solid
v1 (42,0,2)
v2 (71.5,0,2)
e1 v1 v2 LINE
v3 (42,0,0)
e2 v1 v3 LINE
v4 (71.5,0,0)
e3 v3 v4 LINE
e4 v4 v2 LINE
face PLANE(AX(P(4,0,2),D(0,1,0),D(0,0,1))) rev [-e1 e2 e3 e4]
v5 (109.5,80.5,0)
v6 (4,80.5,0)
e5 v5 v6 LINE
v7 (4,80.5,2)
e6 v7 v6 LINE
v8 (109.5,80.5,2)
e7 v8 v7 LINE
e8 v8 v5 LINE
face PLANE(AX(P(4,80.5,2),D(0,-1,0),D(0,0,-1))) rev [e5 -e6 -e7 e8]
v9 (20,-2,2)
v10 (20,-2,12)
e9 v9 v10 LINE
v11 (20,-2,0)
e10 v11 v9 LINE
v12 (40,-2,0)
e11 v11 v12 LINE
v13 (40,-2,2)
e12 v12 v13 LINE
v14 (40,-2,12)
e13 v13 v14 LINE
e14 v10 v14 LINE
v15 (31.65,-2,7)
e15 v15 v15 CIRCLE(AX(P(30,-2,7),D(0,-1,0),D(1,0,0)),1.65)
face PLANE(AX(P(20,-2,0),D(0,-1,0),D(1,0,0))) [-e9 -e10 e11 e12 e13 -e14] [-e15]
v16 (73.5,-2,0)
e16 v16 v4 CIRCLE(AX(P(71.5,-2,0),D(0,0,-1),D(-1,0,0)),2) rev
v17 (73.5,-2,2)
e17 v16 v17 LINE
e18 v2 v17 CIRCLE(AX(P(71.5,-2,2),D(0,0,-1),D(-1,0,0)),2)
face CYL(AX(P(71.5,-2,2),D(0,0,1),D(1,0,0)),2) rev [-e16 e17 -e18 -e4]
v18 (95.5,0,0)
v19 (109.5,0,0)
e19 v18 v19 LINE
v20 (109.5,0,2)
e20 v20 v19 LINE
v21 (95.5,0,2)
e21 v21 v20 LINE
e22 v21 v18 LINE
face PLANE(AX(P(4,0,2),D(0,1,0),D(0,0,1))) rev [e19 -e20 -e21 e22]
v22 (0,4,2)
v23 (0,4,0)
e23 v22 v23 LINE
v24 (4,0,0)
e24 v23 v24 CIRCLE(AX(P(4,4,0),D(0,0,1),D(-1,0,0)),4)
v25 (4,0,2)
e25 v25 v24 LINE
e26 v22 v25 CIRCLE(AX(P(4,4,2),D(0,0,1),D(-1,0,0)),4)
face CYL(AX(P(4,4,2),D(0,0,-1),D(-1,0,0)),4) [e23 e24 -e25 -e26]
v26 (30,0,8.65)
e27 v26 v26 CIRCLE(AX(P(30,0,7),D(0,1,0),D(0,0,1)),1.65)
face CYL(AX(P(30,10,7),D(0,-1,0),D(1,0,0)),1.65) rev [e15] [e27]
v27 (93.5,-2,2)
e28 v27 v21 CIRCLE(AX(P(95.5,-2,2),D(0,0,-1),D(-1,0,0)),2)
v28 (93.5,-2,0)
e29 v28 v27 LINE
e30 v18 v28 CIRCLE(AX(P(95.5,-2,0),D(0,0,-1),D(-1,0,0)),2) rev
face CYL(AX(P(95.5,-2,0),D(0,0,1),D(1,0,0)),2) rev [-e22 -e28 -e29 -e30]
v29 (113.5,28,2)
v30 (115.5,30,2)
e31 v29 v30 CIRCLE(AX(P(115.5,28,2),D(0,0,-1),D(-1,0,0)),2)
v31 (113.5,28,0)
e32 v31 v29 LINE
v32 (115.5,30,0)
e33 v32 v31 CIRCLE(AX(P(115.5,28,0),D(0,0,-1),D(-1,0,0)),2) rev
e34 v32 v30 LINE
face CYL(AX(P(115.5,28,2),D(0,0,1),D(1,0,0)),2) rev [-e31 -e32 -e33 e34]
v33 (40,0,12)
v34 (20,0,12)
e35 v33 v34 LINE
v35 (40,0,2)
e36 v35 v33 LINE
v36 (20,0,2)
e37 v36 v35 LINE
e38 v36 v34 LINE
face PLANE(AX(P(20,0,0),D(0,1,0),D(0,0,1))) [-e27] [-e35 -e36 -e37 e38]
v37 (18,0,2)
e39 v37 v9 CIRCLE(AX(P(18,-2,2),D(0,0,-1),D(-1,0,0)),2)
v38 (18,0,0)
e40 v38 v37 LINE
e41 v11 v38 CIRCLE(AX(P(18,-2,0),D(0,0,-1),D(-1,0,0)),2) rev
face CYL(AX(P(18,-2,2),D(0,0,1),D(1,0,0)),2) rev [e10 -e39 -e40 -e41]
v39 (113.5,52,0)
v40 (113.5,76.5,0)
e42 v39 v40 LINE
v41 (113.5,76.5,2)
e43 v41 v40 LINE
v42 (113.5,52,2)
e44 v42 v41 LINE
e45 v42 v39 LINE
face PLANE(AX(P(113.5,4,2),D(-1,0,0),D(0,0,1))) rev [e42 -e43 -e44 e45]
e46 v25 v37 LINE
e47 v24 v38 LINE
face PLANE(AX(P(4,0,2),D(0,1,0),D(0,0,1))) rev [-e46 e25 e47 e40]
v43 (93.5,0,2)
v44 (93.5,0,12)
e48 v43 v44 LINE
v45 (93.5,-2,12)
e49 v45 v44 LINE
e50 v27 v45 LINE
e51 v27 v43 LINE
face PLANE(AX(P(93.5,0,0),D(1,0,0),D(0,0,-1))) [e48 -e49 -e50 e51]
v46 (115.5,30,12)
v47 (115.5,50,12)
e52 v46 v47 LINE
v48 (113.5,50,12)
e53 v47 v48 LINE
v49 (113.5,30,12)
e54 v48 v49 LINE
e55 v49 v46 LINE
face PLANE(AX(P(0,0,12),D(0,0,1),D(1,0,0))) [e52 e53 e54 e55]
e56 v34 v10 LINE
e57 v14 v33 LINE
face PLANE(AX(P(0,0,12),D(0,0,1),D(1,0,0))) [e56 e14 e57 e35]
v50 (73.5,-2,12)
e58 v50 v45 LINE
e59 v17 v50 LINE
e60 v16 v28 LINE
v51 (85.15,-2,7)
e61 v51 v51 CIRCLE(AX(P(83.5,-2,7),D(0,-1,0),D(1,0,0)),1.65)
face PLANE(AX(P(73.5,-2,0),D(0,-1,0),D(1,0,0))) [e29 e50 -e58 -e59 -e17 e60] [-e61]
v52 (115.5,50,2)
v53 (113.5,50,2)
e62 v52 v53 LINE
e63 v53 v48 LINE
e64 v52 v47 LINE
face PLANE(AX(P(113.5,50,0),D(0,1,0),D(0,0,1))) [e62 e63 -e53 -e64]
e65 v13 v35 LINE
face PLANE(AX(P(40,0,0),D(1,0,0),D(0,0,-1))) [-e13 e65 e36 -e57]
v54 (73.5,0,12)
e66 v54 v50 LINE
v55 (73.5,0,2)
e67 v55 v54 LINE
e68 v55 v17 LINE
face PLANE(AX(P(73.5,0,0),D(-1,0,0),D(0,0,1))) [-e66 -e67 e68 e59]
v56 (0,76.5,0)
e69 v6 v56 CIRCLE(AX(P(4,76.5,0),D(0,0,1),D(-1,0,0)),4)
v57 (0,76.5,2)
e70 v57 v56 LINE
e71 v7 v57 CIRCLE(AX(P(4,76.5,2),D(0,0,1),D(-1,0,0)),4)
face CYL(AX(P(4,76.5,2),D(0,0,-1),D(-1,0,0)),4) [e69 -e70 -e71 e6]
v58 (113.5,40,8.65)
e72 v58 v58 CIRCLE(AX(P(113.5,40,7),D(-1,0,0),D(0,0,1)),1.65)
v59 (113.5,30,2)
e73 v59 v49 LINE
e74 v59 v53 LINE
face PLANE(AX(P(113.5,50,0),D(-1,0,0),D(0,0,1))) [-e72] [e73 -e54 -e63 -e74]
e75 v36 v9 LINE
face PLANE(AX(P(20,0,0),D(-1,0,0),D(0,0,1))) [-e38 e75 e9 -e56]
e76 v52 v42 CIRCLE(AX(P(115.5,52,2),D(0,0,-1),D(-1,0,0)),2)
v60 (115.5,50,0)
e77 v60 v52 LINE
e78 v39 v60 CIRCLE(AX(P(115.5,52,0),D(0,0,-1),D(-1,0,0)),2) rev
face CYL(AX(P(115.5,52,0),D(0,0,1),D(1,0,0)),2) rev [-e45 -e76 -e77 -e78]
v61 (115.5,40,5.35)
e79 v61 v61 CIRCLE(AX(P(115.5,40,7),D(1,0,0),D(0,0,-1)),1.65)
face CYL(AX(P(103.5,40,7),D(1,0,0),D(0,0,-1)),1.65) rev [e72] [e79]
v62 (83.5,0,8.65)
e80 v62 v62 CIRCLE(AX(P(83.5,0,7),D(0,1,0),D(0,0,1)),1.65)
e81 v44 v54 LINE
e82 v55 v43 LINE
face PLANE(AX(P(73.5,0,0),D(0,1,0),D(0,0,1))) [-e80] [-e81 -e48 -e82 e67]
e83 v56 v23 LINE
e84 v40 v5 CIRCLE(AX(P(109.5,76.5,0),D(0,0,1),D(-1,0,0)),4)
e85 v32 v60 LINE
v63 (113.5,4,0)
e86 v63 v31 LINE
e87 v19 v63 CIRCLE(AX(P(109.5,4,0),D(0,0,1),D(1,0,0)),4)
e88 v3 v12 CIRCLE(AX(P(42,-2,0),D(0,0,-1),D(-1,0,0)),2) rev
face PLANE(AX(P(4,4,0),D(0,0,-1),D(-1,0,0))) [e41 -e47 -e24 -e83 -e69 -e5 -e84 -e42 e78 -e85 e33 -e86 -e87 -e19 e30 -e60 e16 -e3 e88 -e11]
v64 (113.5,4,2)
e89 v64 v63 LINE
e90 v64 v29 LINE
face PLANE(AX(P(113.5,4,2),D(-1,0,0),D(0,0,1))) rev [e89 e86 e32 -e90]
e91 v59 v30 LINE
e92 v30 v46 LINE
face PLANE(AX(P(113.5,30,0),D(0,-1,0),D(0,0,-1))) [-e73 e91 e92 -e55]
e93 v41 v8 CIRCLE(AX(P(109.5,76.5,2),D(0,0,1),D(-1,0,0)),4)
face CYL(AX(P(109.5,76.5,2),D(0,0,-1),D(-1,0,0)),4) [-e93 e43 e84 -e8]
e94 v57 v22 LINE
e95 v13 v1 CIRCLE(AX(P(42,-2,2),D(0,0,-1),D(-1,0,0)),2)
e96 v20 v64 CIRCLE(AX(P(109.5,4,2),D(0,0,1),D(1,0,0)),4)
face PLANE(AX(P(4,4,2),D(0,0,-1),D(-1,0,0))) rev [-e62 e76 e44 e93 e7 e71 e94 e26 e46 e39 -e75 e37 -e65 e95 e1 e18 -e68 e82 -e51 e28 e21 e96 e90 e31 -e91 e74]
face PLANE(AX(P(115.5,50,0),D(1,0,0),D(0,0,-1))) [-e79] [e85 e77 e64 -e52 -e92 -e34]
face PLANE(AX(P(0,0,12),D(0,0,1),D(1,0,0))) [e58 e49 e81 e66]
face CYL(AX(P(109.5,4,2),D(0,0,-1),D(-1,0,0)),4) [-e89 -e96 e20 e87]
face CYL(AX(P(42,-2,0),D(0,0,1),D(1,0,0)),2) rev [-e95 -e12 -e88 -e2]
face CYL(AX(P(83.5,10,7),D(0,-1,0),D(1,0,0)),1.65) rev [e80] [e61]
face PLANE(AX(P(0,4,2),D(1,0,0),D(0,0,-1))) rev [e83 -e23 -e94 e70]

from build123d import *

# Parameters (mm, degrees)
EXTRUDE_1_DEPTH      = 2
EXTRUDE_2_DEPTH      = 10
EXTRUDE_2_DEPTH_BACK = 2
SKETCH_2_W           = 2
SKETCH_2_H           = 20
SKETCH_2_W_2         = 20
SKETCH_2_H_2         = 2
SKETCH_3_R           = 1.65
CUT_EXTRUDE_1_DEPTH  = 12
SKETCH_4_R           = 1.65
CUT_EXTRUDE_2_DEPTH  = 12
FILLET_1_R           = 2


with BuildPart() as part:
    # 草图1 → 凸台-拉伸1 (new body)
    with BuildSketch(Plane.XY):
        with BuildLine():
            Line((4, 0), (109.5, 0))
            ThreePointArc((109.5, 0), (112.328427125, 1.171572875), (113.5, 4))
            Line((113.5, 4), (113.5, 76.5))
            ThreePointArc((113.5, 76.5), (112.328427125, 79.328427125), (109.5, 80.5))
            Line((109.5, 80.5), (4, 80.5))
            ThreePointArc((4, 80.5), (1.171572875, 79.328427125), (0, 76.5))
            Line((0, 76.5), (0, 4))
            ThreePointArc((0, 4), (1.171572875, 1.171572875), (4, 0))
        make_face()
    extrude(amount=EXTRUDE_1_DEPTH)

    # 草图2 → 凸台-拉伸2 (add, two sides: drawn at the far end of the back side and taken through both)
    with BuildSketch(Plane.XY.offset(2).offset(-EXTRUDE_2_DEPTH_BACK)):
        with Locations((114.5, 40)):
            Rectangle(SKETCH_2_W, SKETCH_2_H)
        with Locations((30, -1)):
            Rectangle(SKETCH_2_W_2, SKETCH_2_H_2)
        with Locations((83.5, -1)):
            Rectangle(SKETCH_2_W_2, SKETCH_2_H_2)
    extrude(amount=EXTRUDE_2_DEPTH + EXTRUDE_2_DEPTH_BACK)

    # 草图3 → 切除-拉伸1 (cut)
    with BuildSketch(Plane(origin=(115.5, 0, 0), x_dir=(0, 0, -1), z_dir=(1, 0, 0))):
        with Locations((-7, 40)):
            Circle(SKETCH_3_R)
    extrude(amount=-CUT_EXTRUDE_1_DEPTH, mode=Mode.SUBTRACT)

    # 草图4 → 切除-拉伸2 (cut)
    with BuildSketch(Plane(origin=(0, -2, 0), x_dir=(-1, 0, 0), z_dir=(0, -1, 0))):
        with Locations(Location((-83.5, -7, 0), (0, 0, 180))):
            Circle(SKETCH_4_R)
        with Locations(Location((-30, -7, 0), (0, 0, 180))):
            Circle(SKETCH_4_R)
    extrude(amount=-CUT_EXTRUDE_2_DEPTH, mode=Mode.SUBTRACT)

    # 圆角1
    fillet_1_edges = [part.edges().sort_by_distance(p)[0] for p in [
        (113.5, 50, 1),
        (113.5, 30, 1),
        (40, 0, 1),
        (20, 0, 1),
        (73.5, 0, 1),
        (93.5, 0, 1),
    ]]
    fillet(fillet_1_edges, radius=FILLET_1_R - 0.0001)  # a hair under: the kernel refuses the full size


solid = part.part
